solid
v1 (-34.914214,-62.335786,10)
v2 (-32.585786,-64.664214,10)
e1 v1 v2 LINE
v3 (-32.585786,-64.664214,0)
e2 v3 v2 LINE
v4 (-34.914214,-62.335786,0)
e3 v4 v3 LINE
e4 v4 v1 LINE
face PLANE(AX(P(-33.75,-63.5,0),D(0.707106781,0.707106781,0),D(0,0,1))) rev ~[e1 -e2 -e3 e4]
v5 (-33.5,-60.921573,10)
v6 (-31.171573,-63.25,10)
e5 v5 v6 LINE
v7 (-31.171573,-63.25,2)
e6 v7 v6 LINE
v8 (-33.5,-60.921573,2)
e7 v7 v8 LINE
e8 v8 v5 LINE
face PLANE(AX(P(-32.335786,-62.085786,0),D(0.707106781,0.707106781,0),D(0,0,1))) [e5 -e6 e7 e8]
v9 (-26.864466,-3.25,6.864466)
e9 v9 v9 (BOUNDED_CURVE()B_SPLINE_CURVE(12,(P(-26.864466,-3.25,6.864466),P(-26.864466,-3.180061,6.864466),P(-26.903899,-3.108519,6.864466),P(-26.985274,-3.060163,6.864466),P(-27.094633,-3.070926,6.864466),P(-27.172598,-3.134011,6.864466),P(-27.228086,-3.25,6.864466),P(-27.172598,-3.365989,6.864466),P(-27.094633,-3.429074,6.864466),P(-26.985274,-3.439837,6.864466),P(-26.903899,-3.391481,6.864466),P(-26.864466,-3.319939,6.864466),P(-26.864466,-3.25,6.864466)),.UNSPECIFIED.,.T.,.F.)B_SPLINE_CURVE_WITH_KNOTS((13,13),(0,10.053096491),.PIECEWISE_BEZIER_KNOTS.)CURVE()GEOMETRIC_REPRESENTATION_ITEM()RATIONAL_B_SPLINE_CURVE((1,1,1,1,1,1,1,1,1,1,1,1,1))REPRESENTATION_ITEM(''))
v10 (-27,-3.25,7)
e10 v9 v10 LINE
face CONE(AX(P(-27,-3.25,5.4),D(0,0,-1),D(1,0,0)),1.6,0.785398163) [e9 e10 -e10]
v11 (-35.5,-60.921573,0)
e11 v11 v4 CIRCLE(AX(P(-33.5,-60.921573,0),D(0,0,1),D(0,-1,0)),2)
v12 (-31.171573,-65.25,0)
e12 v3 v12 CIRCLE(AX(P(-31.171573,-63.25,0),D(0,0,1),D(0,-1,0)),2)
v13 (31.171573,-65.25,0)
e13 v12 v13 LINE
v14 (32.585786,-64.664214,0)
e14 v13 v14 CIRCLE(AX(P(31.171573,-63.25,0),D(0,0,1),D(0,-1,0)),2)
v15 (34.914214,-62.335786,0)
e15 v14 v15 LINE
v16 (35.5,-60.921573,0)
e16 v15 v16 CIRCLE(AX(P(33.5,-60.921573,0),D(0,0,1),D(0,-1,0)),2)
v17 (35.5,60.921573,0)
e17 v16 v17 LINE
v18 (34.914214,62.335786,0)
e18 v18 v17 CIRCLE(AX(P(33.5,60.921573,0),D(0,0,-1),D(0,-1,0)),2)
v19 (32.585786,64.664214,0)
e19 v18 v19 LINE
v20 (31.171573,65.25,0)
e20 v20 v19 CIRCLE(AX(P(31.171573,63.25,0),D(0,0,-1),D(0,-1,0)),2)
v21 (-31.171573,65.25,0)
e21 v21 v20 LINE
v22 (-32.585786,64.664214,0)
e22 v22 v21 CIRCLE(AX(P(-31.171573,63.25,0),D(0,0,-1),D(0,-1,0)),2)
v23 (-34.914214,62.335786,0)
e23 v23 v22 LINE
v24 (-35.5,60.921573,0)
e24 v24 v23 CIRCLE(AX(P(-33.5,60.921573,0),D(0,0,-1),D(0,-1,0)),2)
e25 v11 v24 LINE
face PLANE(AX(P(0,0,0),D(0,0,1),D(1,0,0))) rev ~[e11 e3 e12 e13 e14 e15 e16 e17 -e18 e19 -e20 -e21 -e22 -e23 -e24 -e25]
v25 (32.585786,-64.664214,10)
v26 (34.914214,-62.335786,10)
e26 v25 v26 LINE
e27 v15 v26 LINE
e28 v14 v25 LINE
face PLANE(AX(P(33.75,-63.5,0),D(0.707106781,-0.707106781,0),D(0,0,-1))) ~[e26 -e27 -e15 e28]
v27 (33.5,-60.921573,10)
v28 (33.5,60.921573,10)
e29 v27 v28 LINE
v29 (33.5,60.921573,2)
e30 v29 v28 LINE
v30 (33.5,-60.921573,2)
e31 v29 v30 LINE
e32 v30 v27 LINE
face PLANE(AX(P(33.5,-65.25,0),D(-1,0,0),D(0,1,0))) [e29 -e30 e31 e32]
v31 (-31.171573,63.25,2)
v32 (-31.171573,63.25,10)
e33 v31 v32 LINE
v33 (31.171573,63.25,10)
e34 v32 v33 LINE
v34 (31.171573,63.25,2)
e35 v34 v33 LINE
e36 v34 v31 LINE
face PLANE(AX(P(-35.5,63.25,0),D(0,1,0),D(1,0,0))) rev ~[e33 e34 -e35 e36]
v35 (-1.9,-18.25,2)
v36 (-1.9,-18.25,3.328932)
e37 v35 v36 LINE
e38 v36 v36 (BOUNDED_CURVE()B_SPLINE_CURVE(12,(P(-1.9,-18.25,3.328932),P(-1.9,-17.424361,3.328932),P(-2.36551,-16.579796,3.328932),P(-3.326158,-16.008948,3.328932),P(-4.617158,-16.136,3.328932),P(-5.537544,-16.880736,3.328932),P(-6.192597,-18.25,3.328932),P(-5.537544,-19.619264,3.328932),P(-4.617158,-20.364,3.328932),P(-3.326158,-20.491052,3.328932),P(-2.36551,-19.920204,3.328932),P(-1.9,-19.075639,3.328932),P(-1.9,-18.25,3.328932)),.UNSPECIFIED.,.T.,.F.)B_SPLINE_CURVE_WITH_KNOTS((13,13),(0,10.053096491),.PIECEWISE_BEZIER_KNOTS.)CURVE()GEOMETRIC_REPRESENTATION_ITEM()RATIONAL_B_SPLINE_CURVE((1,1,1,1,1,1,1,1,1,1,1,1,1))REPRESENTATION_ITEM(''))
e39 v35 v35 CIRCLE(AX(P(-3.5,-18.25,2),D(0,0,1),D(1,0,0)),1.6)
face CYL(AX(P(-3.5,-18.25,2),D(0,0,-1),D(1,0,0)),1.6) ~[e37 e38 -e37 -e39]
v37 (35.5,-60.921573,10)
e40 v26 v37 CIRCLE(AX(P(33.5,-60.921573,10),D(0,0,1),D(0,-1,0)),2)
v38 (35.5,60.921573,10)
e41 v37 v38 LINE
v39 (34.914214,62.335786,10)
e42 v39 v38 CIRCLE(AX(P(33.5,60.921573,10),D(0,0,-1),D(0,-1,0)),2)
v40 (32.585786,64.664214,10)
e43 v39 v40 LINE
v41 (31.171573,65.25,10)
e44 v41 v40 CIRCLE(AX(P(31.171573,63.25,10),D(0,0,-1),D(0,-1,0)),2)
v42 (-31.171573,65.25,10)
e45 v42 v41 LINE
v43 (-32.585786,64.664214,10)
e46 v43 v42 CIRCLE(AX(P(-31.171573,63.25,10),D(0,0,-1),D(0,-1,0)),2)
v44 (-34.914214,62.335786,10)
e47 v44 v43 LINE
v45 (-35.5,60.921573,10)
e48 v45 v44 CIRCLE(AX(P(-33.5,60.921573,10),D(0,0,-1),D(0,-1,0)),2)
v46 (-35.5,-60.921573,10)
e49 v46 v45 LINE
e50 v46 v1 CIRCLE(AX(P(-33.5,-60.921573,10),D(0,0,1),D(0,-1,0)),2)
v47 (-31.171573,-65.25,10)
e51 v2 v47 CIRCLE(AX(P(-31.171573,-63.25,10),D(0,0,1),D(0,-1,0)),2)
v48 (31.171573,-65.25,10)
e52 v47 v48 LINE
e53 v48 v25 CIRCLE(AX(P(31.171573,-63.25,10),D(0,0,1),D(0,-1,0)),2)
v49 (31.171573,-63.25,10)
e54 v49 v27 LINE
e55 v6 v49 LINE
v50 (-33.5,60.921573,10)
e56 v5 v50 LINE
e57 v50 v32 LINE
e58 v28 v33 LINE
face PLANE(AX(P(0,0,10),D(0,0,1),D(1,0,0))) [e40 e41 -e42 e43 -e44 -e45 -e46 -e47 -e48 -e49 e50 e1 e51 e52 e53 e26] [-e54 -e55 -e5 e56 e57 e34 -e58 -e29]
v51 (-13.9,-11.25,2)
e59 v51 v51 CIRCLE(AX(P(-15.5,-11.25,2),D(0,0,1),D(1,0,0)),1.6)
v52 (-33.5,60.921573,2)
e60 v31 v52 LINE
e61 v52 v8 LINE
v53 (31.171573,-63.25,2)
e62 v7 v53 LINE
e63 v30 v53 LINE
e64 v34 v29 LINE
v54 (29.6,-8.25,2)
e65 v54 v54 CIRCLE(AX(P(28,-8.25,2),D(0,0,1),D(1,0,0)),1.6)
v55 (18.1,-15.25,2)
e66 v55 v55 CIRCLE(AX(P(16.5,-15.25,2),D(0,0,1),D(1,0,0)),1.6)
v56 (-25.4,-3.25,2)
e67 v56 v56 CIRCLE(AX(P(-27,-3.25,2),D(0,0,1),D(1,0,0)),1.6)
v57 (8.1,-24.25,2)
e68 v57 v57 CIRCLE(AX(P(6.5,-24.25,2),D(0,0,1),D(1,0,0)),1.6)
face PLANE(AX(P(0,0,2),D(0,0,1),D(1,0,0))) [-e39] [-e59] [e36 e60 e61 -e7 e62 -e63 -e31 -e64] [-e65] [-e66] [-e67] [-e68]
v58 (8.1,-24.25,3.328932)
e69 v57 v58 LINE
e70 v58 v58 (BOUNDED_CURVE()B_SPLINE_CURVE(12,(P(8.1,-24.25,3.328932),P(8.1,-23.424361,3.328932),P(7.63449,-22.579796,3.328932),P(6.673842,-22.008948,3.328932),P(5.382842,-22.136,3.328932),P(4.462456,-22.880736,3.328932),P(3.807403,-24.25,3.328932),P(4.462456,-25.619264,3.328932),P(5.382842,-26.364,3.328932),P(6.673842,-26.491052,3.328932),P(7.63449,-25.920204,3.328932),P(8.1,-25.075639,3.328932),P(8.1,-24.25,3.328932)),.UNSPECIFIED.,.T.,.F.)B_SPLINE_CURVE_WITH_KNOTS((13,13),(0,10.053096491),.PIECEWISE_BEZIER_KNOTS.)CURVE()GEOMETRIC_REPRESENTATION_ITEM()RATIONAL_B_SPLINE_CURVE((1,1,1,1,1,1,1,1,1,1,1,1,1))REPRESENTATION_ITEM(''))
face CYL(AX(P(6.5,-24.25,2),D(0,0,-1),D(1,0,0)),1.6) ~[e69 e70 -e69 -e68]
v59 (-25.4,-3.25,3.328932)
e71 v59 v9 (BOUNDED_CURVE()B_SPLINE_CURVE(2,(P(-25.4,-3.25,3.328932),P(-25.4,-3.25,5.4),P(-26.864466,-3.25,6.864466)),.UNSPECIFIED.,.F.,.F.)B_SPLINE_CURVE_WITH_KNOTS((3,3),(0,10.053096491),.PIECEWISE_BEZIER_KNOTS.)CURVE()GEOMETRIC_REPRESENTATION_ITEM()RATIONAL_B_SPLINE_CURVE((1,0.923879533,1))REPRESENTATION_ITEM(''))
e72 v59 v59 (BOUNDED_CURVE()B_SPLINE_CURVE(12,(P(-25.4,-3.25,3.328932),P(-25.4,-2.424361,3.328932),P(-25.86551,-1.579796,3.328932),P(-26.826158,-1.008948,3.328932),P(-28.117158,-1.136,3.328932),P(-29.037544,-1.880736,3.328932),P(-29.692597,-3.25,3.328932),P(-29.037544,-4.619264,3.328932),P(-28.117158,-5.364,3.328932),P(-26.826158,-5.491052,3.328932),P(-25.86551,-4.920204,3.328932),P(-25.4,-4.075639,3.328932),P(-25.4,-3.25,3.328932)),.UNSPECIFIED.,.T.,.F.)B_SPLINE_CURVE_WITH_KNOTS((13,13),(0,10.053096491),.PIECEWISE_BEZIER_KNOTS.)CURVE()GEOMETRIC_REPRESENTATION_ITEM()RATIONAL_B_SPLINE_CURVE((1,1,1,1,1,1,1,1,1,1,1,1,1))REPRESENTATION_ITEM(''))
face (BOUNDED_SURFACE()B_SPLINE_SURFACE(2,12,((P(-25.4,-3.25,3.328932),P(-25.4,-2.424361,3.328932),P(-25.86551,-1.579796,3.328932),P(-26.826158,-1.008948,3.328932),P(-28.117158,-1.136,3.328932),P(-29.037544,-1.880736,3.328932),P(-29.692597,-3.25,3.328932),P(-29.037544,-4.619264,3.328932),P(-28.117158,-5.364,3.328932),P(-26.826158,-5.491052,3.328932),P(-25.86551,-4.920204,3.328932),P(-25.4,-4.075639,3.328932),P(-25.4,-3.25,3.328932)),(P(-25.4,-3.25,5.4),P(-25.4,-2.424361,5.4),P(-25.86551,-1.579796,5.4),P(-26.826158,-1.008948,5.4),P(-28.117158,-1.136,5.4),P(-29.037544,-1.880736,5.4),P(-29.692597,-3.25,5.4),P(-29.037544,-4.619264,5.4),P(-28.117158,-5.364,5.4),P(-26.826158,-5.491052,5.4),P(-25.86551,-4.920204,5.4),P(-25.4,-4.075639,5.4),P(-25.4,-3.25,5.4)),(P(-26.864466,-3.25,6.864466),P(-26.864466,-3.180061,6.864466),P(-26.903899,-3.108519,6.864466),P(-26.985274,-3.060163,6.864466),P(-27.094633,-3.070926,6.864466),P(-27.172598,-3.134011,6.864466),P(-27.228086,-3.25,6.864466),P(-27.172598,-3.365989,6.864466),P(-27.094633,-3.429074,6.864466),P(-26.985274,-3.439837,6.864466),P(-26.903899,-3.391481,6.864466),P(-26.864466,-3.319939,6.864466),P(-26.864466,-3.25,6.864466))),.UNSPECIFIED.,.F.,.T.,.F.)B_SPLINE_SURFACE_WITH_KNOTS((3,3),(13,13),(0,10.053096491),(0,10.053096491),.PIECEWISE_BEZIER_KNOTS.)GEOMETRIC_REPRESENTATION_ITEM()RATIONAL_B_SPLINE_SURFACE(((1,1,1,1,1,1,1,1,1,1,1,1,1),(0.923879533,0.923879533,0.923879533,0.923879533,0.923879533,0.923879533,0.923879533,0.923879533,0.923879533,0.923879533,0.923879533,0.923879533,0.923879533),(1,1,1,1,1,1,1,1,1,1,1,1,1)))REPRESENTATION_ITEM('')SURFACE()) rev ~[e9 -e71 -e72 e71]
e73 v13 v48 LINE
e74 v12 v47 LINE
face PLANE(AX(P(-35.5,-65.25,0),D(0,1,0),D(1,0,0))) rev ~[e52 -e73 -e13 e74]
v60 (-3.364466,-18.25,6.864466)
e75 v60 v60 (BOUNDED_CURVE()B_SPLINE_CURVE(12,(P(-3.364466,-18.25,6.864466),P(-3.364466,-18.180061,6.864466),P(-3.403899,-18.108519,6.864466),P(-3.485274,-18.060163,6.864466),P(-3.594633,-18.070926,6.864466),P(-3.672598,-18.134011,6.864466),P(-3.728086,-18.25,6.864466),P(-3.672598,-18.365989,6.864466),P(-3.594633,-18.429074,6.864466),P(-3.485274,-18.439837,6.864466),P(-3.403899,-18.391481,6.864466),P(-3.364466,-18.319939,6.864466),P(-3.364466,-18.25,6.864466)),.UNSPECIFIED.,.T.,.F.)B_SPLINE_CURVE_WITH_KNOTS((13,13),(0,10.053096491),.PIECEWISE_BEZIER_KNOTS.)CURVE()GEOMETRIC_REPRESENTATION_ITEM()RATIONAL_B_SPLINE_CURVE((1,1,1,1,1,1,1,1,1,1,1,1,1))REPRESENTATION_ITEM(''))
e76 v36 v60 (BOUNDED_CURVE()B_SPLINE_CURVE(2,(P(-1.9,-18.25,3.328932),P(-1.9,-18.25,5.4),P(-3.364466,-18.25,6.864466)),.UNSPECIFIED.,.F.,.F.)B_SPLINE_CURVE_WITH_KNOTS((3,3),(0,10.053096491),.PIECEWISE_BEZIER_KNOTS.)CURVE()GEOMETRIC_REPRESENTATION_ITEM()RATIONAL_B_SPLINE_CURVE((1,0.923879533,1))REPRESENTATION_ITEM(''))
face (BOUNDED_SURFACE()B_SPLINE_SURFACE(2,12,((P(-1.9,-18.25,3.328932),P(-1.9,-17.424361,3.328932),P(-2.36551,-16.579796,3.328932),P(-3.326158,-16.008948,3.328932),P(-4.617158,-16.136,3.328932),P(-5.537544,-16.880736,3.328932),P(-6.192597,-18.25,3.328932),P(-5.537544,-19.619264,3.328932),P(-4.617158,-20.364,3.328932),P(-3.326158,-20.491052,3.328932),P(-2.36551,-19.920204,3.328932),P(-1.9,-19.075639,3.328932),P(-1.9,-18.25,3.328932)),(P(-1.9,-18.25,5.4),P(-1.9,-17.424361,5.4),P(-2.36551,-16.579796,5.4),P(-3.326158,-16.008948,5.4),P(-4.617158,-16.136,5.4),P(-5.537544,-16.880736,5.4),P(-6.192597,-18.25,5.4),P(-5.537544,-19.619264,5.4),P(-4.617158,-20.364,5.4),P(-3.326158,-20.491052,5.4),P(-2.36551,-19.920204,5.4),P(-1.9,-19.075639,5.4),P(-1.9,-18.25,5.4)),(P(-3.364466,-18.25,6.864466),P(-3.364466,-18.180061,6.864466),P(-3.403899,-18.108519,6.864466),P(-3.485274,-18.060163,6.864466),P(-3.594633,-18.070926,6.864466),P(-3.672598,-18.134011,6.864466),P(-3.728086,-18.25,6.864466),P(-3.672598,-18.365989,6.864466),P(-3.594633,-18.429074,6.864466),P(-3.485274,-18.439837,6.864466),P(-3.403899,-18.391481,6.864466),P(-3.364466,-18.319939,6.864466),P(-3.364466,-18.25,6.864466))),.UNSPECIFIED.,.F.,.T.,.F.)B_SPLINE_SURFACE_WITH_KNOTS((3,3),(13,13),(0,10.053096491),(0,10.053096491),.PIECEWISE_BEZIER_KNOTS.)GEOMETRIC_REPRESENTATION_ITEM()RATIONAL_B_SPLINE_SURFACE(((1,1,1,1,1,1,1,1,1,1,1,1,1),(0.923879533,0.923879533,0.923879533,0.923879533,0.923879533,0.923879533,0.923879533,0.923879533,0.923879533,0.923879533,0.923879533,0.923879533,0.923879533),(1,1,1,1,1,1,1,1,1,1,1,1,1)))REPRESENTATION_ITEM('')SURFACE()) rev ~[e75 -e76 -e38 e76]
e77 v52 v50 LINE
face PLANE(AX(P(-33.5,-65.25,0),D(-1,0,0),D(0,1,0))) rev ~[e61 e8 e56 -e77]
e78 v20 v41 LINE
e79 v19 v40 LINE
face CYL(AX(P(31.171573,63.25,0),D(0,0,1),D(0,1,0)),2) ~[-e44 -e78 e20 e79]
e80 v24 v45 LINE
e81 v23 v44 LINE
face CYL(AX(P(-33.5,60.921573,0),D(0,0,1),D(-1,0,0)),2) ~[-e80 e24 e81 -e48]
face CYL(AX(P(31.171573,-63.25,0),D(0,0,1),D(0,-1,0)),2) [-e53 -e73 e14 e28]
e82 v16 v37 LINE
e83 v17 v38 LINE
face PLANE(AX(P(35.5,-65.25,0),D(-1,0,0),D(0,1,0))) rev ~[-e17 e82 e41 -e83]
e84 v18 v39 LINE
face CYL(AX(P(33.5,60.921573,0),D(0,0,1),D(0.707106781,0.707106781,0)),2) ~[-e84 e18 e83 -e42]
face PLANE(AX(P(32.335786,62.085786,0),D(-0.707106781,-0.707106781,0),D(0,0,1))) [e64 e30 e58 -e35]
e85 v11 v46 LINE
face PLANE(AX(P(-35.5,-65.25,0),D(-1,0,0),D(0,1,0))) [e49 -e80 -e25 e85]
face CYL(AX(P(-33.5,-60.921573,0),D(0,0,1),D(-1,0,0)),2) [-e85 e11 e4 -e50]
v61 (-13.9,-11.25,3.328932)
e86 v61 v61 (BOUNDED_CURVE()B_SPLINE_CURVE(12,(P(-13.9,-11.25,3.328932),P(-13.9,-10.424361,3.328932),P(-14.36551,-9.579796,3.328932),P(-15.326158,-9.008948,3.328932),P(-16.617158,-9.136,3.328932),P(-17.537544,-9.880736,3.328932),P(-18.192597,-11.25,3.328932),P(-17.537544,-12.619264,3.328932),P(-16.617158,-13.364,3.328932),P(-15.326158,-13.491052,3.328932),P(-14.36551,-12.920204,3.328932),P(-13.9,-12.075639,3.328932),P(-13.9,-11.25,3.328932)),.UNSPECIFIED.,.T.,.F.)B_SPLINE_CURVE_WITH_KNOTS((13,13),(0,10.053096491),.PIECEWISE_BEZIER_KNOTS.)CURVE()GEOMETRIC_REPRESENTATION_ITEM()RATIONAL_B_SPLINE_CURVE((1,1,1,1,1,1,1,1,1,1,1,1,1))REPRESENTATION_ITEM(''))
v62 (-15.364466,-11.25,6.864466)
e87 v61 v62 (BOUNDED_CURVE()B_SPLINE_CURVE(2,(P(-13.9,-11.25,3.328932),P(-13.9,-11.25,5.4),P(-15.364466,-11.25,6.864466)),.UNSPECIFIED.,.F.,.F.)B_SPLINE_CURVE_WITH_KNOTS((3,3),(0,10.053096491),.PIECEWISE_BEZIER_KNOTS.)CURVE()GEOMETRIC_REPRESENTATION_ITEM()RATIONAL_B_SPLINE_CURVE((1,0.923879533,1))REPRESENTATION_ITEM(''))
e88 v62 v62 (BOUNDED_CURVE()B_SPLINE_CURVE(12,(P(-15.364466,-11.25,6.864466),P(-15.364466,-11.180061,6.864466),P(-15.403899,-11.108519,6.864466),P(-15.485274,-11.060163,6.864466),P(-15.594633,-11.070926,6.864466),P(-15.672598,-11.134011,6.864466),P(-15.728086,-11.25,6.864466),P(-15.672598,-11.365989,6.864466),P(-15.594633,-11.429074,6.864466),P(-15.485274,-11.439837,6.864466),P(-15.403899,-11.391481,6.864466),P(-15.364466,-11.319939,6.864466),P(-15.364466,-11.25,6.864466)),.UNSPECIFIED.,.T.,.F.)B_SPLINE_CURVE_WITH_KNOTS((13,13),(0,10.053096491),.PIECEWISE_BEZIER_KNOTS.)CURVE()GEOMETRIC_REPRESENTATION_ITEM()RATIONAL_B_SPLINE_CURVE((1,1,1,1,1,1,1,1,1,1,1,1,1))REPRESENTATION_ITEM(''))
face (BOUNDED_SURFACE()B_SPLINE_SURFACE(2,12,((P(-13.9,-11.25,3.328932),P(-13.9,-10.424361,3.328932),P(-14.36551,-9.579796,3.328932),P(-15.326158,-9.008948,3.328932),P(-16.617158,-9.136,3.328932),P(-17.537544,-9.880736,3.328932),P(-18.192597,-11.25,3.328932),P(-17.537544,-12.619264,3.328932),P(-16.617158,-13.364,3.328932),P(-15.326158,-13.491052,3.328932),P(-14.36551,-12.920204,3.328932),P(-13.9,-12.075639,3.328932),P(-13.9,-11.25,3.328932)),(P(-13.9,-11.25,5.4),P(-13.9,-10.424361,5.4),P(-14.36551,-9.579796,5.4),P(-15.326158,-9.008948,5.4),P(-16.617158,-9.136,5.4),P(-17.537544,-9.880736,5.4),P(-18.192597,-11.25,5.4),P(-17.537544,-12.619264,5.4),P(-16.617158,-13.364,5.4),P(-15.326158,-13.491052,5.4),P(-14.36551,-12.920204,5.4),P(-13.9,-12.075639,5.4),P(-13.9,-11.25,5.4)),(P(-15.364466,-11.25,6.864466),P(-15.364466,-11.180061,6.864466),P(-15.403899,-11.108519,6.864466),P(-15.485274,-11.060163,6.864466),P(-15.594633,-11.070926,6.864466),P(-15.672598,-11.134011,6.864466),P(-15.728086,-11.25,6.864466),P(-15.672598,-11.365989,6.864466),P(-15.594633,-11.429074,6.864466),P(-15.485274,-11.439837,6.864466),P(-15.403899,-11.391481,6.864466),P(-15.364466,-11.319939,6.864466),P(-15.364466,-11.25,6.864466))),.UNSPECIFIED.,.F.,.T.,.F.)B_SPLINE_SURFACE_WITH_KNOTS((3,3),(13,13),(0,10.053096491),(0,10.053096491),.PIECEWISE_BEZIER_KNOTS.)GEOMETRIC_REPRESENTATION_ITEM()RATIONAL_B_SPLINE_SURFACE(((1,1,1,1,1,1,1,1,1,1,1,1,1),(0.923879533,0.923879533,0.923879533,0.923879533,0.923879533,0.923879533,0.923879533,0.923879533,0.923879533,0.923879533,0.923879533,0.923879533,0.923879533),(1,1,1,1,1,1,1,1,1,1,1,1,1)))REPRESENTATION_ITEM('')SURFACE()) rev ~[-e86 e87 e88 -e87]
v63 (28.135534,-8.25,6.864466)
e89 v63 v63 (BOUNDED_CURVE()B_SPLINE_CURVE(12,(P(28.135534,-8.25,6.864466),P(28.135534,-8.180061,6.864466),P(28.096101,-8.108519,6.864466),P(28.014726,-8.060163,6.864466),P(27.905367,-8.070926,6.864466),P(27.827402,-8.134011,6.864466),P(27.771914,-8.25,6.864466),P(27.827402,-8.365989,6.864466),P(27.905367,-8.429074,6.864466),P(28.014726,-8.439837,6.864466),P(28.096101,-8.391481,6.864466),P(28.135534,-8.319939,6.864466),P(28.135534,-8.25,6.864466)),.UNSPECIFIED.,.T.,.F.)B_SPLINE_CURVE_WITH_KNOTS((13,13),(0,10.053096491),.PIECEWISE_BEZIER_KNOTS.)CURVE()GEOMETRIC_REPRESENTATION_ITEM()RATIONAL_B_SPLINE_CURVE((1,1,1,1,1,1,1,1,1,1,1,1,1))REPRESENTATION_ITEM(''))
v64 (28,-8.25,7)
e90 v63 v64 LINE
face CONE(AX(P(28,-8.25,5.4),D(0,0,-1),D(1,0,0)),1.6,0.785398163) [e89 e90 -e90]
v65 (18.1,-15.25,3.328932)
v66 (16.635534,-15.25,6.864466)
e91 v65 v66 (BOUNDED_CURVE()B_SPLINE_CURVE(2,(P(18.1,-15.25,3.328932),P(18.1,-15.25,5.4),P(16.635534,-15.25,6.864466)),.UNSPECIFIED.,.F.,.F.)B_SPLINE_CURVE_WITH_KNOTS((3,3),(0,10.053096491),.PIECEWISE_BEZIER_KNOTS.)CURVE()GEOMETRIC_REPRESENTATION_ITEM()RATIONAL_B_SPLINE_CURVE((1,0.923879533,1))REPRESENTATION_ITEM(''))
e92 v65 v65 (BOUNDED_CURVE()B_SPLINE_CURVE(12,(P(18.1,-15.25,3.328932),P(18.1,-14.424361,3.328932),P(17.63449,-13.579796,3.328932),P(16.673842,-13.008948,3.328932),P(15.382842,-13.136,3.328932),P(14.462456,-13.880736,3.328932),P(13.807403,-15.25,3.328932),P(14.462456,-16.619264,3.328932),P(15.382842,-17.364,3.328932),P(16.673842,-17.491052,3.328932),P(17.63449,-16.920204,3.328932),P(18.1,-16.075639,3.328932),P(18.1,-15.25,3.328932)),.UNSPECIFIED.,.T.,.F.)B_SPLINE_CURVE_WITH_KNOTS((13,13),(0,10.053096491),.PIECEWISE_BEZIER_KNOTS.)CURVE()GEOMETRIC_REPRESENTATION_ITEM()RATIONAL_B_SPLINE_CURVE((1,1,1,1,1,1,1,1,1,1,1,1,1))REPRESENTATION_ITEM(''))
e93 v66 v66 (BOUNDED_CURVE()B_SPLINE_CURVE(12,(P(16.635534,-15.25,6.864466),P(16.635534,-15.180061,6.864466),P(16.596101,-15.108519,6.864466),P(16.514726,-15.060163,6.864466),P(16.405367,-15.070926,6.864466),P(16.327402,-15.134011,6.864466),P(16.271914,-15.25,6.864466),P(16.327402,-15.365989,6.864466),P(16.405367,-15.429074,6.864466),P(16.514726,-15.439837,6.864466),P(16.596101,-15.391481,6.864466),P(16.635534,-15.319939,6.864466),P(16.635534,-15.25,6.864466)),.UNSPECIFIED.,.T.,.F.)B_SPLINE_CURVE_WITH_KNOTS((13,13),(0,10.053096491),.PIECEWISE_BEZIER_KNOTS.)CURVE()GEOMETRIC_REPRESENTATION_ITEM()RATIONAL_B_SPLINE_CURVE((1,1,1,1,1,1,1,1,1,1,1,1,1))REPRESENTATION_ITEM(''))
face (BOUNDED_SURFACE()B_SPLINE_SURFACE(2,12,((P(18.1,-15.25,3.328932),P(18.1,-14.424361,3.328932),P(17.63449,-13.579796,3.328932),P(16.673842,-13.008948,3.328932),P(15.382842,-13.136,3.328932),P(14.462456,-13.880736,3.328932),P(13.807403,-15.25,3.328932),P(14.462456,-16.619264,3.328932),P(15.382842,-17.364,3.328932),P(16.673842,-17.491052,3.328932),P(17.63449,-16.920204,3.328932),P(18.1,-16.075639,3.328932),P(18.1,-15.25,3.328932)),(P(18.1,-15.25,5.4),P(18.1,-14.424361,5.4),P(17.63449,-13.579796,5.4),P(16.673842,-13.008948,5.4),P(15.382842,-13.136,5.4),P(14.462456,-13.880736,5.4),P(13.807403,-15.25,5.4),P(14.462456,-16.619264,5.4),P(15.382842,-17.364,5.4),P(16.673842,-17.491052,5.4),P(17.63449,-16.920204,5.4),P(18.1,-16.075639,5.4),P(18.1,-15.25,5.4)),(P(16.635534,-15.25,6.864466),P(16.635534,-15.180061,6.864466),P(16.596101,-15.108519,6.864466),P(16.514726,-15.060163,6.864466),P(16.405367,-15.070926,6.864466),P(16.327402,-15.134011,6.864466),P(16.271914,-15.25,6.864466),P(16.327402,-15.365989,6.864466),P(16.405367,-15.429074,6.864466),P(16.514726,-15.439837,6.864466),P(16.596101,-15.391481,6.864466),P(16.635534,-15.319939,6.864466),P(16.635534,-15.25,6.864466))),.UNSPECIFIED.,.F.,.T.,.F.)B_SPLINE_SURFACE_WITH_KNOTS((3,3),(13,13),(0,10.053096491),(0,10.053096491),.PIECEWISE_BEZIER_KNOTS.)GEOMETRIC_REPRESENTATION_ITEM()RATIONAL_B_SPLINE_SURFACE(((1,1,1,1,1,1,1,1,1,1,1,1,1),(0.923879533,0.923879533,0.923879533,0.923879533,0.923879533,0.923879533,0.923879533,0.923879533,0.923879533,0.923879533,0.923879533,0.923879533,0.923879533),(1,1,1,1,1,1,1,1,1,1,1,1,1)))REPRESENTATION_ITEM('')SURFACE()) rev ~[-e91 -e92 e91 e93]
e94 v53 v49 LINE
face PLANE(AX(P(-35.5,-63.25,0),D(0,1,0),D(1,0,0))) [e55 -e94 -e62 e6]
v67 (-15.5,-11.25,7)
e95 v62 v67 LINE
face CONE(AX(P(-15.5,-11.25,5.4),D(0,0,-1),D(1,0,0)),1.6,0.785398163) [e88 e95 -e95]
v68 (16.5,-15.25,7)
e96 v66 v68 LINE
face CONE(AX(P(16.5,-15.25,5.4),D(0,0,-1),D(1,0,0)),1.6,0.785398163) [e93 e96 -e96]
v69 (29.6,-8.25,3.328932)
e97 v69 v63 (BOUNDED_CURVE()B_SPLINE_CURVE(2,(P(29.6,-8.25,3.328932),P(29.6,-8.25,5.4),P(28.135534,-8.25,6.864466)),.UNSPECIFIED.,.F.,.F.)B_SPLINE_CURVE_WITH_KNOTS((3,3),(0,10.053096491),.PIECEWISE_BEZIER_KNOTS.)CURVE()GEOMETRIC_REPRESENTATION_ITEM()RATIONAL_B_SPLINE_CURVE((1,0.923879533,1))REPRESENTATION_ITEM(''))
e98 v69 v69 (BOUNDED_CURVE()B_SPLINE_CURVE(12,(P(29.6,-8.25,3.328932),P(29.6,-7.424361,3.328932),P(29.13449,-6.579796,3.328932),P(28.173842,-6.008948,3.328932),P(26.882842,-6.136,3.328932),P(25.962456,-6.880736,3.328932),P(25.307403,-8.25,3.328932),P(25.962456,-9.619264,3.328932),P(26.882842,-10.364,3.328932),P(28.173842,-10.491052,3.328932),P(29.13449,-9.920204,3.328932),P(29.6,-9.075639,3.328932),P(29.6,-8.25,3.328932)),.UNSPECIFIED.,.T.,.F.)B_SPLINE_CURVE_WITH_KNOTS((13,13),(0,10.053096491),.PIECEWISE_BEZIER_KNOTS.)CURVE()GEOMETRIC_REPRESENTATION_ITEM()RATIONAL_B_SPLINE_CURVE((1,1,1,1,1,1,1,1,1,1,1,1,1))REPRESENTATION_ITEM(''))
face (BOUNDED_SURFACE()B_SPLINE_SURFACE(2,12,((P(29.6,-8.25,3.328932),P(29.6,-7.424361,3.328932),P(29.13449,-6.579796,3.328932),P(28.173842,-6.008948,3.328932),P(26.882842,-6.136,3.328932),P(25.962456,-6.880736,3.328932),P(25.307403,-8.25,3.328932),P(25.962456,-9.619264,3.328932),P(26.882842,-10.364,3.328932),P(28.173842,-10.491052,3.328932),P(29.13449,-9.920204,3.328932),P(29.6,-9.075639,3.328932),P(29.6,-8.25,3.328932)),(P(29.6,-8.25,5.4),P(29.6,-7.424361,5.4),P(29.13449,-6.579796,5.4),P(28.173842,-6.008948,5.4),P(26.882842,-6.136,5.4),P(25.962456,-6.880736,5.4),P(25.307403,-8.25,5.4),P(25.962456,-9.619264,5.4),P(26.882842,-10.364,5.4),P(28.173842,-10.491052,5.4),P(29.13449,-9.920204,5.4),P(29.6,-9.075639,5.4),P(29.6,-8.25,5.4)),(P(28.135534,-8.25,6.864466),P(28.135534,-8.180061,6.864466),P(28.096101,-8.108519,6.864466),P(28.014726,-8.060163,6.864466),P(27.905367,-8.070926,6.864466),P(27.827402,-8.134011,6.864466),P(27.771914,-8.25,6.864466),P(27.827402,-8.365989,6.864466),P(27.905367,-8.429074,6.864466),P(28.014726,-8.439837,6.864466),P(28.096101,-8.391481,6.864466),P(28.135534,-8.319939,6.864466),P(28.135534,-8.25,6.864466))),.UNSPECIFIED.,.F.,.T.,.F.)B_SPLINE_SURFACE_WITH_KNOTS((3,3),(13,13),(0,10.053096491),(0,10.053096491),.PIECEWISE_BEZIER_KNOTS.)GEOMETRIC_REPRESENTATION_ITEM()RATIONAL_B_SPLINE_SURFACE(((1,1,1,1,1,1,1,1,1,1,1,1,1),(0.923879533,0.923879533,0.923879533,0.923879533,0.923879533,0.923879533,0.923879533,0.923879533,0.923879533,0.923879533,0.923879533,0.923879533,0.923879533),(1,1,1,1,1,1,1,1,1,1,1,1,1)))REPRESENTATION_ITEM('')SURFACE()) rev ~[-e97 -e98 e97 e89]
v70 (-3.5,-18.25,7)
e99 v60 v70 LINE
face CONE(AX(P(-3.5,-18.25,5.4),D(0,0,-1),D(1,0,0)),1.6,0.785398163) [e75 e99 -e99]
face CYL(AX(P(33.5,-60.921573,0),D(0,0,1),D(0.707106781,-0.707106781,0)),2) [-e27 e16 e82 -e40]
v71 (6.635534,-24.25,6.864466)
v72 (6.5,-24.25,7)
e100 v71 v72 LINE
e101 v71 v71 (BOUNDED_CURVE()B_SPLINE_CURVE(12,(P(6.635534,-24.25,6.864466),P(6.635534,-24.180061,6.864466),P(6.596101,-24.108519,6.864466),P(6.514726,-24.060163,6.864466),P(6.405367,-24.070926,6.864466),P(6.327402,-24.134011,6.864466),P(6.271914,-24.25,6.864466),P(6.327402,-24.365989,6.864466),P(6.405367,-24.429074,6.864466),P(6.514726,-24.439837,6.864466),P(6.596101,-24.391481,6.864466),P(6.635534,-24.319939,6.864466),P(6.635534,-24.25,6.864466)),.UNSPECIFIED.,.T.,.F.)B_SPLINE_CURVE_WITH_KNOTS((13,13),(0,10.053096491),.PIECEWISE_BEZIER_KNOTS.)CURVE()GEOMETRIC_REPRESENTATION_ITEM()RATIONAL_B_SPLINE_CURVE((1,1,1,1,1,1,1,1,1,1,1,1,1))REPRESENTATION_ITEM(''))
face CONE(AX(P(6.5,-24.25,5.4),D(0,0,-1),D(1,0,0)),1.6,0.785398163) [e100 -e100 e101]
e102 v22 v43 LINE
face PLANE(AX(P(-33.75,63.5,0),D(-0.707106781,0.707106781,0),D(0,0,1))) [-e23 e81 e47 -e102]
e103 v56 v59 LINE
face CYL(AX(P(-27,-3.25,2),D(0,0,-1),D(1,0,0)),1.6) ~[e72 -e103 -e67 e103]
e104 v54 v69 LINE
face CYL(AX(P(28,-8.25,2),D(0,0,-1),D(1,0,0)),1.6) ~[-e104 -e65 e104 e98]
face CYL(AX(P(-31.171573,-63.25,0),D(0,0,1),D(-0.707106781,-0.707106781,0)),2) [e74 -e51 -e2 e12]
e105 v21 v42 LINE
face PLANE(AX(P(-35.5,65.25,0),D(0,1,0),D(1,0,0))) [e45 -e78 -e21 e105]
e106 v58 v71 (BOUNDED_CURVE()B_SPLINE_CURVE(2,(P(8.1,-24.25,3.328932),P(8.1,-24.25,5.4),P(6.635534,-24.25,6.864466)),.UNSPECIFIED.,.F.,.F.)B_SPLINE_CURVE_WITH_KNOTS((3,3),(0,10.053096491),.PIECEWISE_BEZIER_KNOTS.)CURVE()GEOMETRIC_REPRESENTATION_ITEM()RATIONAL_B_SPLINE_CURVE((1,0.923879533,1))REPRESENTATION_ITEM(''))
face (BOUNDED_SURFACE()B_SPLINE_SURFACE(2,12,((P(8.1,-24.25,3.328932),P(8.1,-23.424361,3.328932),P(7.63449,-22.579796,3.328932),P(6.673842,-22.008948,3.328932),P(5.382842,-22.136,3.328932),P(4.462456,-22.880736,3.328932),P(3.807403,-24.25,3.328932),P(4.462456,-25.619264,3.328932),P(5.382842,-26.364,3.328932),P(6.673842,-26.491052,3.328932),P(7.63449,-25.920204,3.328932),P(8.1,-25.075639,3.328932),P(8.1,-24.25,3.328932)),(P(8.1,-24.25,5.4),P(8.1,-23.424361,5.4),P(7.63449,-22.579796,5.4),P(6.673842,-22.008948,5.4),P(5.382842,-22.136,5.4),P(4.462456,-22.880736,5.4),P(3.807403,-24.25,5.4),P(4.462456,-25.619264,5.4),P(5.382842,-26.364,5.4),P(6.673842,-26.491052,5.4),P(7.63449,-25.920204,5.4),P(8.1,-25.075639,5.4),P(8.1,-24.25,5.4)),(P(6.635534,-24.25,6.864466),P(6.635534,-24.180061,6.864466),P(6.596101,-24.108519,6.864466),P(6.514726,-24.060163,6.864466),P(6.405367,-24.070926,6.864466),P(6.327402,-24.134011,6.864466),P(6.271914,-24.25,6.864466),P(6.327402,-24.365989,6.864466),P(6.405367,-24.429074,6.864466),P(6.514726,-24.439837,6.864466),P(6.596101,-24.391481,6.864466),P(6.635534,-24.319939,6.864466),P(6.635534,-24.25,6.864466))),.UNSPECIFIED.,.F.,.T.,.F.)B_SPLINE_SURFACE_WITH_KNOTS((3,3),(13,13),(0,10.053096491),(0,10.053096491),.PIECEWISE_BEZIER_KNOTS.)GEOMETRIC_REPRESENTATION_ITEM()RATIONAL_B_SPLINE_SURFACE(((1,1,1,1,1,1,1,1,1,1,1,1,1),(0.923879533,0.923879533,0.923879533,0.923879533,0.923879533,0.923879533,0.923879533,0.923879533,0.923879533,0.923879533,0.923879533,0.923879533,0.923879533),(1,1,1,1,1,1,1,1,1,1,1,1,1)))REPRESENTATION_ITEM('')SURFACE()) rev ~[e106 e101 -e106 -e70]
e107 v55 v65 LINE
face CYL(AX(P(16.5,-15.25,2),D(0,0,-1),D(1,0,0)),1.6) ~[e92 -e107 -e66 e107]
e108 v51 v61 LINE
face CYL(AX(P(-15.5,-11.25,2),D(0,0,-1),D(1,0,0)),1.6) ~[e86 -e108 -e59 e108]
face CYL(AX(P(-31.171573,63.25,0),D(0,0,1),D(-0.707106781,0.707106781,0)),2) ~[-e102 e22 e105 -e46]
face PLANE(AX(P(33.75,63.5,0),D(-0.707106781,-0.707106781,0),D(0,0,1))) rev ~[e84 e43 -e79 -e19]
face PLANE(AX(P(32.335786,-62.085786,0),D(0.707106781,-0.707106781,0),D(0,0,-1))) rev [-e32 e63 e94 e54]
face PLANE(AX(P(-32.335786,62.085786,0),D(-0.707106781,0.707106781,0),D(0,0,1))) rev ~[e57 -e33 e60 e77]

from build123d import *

# Parameters (mm, degrees)
F0_W     = 71
F0_H     = 130.5
F1_DEPTH = 10
F2_SIZE  = 3.5
F3_R     = 2
F4_T     = 2
F5_R     = 1.6
F6_DEPTH = 5
F7_SIZE  = 1.6
F8_R     = 5


# Not quite as in the source:
# - a shell that OpenCascade refuses in one call is made with other operations: the cavity is built on its own and cut out


with BuildPart() as f1:
    # F0 (on Top) → F1 (new body)
    with BuildSketch(Plane.XY):
        Rectangle(F0_W, F0_H)
    extrude(amount=F1_DEPTH)

    # F2
    f2_edges = [f1.edges().sort_by_distance(p)[0] for p in [
        (-35.5, -65.25, 5),
        (35.5, -65.25, 5),
        (-35.5, 65.25, 5),
        (35.5, 65.25, 5),
    ]]
    chamfer(f2_edges, length=F2_SIZE)

    # F3
    f3_edges = [f1.edges().sort_by_distance(p)[0] for p in [
        (-32, 65.25, 5),
        (-35.5, 61.75, 5),
        (32, 65.25, 5),
        (35.5, 61.75, 5),
        (32, -65.25, 5),
        (35.5, -61.75, 5),
        (-35.5, -61.75, 5),
        (-32, -65.25, 5),
    ]]
    fillet(f3_edges, radius=F3_R)

    # F4: shell of thickness 2, made by hand


with BuildPart() as f4_core1:
    # F4_t2: copy of F1
    add(f1.part)

    # the walls: a layer under each face that stays
    f4_faces = [f4_core1.faces().sort_by_distance(p)[0] for p in [
        (0, -65.25, 5),
        (0, 0, 0),
        (-33.75, -63.5, 5),
        (33.75, -63.5, 5),
        (-35.5, 0, 5),
        (35.5, 0, 5),
        (-33.75, 63.5, 5),
        (33.75, 63.5, 5),
        (0, 65.25, 5),
    ]]
    thicken(f4_faces, amount=-F4_T, mode=Mode.SUBTRACT)


with BuildPart() as f1_1:
    add(f1.part)

    # what is left inside the walls is the cavity
    f4_cavity = [f4_core1.part.solids().sort_by_distance(p)[0] for p in [
        (0, -21.083333, 2.02),
    ]]
    add(f4_cavity, mode=Mode.SUBTRACT)

    # F5 (on face) → F6 (join)
    with BuildSketch(Plane.XY.offset(2)):
        with Locations((-27, -3.25)):
            Circle(F5_R)
        with Locations((-15.5, -11.25)):
            Circle(F5_R)
        with Locations((-3.5, -18.25)):
            Circle(F5_R)
        with Locations((6.5, -24.25)):
            Circle(F5_R)
        with Locations((16.5, -15.25)):
            Circle(F5_R)
        with Locations((28, -8.25)):
            Circle(F5_R)
    extrude(amount=F6_DEPTH)

    # F7
    f7_edges = [f1_1.edges().sort_by_distance(p)[0] for p in [
        (-28.6, -3.25, 7),
        (-17.1, -11.25, 7),
        (-5.1, -18.25, 7),
        (4.9, -24.25, 7),
        (14.9, -15.25, 7),
        (26.4, -8.25, 7),
    ]]
    chamfer(f7_edges, length=F7_SIZE)

    # F8
    f8_edges = [f1_1.edges().sort_by_distance(p)[0] for p in [
        (-28.6, -3.25, 5.4),
        (-17.1, -11.25, 5.4),
        (-5.1, -18.25, 5.4),
        (4.9, -24.25, 5.4),
        (14.9, -15.25, 5.4),
        (26.4, -8.25, 5.4),
    ]]
    fillet(f8_edges, radius=F8_R)


solid = f1_1.part
